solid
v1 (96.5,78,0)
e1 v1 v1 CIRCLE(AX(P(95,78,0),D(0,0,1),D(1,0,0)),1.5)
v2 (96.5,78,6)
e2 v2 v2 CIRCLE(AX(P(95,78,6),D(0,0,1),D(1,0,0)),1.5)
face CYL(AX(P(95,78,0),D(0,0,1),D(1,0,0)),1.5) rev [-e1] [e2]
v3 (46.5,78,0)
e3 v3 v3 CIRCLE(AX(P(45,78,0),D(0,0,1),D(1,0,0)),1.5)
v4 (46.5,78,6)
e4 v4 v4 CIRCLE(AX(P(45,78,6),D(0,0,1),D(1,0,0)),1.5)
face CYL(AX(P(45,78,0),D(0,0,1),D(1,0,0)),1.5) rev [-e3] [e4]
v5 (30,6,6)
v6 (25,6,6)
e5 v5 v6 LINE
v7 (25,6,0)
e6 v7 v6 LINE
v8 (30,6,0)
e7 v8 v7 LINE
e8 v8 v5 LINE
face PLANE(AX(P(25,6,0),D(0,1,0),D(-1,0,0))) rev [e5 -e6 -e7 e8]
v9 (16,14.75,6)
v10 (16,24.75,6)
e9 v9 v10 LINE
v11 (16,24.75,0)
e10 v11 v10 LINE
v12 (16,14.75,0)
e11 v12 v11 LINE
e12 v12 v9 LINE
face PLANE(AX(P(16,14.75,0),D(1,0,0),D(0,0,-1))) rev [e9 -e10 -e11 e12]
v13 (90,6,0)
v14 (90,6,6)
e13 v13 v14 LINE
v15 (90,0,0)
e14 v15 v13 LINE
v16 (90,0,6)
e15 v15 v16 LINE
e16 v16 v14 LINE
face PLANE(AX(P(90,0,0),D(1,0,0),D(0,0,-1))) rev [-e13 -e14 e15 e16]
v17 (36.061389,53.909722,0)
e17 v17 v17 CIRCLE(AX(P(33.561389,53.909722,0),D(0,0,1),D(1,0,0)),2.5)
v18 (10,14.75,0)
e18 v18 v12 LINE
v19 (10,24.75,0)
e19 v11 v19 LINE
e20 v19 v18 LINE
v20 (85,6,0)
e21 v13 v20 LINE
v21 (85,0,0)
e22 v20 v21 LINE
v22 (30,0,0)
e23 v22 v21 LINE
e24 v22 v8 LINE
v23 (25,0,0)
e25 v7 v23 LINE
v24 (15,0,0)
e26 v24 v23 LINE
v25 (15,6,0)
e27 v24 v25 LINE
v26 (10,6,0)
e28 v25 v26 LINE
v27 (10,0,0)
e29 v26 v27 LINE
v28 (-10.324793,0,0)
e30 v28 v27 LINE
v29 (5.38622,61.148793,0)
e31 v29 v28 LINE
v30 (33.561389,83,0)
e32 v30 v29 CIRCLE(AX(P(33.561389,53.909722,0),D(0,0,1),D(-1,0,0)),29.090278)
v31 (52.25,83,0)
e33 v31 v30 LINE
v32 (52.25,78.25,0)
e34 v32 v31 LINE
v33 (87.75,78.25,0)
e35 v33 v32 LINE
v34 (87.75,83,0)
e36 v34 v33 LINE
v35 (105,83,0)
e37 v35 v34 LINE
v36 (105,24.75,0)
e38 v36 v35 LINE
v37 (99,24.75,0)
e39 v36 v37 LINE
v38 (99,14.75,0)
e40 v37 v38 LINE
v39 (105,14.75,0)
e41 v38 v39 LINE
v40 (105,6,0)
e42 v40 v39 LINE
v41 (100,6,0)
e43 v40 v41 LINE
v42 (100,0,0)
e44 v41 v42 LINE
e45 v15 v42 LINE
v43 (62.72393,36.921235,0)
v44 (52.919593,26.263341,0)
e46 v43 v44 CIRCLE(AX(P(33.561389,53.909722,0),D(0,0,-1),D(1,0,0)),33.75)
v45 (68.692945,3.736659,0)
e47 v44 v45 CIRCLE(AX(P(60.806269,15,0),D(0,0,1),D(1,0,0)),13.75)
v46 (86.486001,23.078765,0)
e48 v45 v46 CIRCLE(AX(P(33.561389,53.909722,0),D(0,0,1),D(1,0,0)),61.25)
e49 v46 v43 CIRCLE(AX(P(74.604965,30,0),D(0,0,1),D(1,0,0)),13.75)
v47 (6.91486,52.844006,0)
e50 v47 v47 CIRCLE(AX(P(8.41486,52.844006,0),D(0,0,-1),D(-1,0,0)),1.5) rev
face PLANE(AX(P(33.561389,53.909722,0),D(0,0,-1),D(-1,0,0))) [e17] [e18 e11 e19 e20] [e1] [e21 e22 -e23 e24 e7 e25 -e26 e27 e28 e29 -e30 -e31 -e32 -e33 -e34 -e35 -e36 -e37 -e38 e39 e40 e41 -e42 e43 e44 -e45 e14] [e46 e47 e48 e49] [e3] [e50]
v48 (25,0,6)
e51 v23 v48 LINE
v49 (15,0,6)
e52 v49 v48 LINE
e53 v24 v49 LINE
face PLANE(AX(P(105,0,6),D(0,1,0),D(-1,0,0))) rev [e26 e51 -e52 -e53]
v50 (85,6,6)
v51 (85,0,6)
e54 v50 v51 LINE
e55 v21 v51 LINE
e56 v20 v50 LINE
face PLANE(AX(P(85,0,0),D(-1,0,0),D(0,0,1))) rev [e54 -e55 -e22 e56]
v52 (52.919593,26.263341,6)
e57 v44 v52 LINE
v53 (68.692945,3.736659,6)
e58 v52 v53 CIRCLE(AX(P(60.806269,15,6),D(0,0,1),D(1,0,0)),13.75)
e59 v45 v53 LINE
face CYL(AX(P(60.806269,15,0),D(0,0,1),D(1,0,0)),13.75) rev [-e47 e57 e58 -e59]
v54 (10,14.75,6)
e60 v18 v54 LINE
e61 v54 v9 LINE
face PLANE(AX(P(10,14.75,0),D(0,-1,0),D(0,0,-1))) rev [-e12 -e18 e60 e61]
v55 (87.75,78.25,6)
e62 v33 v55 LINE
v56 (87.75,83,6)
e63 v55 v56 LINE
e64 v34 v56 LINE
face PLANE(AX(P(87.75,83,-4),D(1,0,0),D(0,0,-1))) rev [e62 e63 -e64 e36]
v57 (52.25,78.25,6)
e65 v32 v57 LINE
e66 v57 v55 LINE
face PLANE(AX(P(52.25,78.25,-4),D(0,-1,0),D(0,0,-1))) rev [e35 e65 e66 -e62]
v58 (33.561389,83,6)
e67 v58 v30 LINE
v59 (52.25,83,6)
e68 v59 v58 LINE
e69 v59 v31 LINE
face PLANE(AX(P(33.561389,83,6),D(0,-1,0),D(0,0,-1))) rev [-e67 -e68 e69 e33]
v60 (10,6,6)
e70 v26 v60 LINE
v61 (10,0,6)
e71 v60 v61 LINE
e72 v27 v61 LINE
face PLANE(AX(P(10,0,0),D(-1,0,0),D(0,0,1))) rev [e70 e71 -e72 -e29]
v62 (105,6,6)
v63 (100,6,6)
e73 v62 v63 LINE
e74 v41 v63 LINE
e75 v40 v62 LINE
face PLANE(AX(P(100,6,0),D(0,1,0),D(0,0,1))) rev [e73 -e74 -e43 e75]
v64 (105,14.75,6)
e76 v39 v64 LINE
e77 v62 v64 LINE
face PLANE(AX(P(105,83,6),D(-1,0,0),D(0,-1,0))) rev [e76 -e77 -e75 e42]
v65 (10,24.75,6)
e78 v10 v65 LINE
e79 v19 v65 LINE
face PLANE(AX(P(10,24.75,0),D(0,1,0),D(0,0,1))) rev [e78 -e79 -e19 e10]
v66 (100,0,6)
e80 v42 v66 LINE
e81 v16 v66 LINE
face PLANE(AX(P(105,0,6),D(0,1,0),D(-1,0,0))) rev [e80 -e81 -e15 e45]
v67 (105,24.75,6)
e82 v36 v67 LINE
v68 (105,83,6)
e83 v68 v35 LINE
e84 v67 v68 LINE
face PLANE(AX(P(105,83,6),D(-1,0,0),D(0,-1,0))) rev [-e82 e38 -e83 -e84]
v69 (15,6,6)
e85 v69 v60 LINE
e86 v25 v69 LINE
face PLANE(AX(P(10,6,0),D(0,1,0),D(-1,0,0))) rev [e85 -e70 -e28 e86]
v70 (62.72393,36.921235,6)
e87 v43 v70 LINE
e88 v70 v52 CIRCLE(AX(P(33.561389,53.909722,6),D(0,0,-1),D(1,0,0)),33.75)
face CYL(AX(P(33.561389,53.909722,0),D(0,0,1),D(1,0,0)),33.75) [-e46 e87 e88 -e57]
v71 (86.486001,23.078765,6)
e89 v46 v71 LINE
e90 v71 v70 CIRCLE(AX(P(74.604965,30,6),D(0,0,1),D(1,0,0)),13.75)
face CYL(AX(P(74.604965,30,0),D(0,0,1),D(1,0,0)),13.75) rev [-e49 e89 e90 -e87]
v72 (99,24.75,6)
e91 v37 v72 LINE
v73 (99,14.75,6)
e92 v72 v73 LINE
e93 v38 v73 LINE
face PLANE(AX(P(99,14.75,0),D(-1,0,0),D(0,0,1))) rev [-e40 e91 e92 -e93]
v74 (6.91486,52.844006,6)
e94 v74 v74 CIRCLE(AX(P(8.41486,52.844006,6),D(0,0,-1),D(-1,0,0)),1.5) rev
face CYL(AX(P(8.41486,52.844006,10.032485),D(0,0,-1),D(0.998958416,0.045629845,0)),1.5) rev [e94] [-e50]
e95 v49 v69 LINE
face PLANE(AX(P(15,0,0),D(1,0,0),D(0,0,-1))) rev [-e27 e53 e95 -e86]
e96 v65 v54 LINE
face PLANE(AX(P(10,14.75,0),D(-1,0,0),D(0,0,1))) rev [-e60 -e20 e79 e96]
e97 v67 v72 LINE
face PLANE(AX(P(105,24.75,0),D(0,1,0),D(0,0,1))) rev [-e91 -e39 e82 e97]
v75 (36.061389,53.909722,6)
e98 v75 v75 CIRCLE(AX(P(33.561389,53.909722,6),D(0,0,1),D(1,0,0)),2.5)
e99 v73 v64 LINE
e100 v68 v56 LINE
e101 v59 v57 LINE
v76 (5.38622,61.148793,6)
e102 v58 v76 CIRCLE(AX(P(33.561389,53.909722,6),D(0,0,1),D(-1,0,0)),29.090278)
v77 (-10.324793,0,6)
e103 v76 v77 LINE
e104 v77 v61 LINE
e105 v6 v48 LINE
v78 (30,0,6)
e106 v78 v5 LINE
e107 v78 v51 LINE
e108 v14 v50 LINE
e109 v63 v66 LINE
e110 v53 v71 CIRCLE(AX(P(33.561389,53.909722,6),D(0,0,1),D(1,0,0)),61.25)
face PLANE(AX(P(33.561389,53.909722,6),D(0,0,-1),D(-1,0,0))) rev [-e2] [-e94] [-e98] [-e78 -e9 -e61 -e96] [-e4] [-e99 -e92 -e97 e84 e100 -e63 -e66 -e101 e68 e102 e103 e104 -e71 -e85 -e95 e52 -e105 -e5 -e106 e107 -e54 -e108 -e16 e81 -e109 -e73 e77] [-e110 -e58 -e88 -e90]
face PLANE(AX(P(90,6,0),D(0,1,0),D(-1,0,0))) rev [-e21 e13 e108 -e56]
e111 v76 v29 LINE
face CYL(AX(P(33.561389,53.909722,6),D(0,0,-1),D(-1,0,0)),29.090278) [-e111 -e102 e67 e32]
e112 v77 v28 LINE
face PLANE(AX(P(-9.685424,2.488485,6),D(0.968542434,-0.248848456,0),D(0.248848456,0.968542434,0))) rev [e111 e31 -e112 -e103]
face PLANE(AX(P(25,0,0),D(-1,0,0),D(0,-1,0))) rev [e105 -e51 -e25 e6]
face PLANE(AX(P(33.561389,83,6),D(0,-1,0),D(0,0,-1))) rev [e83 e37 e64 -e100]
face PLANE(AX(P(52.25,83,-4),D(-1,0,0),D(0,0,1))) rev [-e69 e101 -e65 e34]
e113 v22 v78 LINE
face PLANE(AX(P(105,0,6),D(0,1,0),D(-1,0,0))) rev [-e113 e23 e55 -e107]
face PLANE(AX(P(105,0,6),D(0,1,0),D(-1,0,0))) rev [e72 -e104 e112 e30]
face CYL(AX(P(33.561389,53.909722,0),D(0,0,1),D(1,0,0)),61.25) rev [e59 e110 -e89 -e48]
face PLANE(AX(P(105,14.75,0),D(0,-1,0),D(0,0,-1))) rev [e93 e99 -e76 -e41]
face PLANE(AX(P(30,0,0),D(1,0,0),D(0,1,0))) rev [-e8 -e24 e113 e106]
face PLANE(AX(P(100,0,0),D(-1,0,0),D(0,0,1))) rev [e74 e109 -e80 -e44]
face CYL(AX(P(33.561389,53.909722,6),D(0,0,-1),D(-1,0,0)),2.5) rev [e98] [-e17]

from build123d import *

# Parameters (mm, degrees)
SKETCH1_R           = 2.5
BOSS_EXTRUDE1_DEPTH = 6
SKETCH2_W           = 5
SKETCH2_H           = 6
SKETCH2_W_2         = 6
SKETCH2_H_2         = 10
CUT_EXTRUDE1_DEPTH  = 134.97761007
SKETCH3_R           = 1.5
CUT_EXTRUDE2_DEPTH  = 134.97761007
SKETCH4_W           = 35.5
SKETCH4_H           = 4.75
CUT_EXTRUDE3_DEPTH  = 10
CAVITY1_OUTLINE_R   = 1.5
CAVITY1_DEPTH       = 6
CUT_EXTRUDE4_DEPTH  = 134.97761007


# Read off the part's stored shape, not the designer's step: Cavity1
with BuildPart() as part:
    # Sketch1 → Boss-Extrude1 (new body)
    with BuildSketch(Plane.XY):
        with BuildLine():
            Line((-9.685424338, 2.488484559), (5.386220056, 61.148792841))
            ThreePointArc((5.386220056, 61.148792841), (15.733633721, 76.897010412), (33.561388608, 83))
            Line((33.561388608, 83), (105, 83))
            Line((105, 83), (105, 0))
            Line((105, 0), (-10.324792855, 0))
            Line((-10.324792855, 0), (-9.685424338, 2.488484559))
        make_face()
        with Locations((33.561388608, 53.909722104)):
            Circle(SKETCH1_R, mode=Mode.SUBTRACT)
        with BuildLine():
            ThreePointArc((67.975974789, 4.760599446), (77.719162031, 13.288409394), (85.405906554, 23.707967867))
            ThreePointArc((85.405906554, 23.707967867), (80.896997447, 40.800941239), (63.804024076, 36.292032133))
            ThreePointArc((63.804024076, 36.292032133), (59.320089771, 30.213956356), (53.63656388, 25.239400554))
            ThreePointArc((53.63656388, 25.239400554), (50.566868781, 7.830294546), (67.975974789, 4.760599446))
        make_face(mode=Mode.SUBTRACT)
    extrude(amount=BOSS_EXTRUDE1_DEPTH)

    # Sketch2 → Cut-Extrude1 (cut, through all)
    with BuildSketch(Plane.XY.offset(6)):
        with Locations((12.5, 3)):
            Rectangle(SKETCH2_W, SKETCH2_H)
        with Locations((102.5, 3)):
            Rectangle(SKETCH2_W, SKETCH2_H)
        with Locations((27.5, 3)):
            Rectangle(SKETCH2_W, SKETCH2_H)
        with Locations((87.5, 3)):
            Rectangle(SKETCH2_W, SKETCH2_H)
        with Locations((102, 19.75)):
            Rectangle(SKETCH2_W_2, SKETCH2_H_2)
        with Locations((13, 19.75)):
            Rectangle(SKETCH2_W_2, SKETCH2_H_2)
    extrude(amount=-CUT_EXTRUDE1_DEPTH, mode=Mode.SUBTRACT)

    # Sketch3 → Cut-Extrude2 (cut, through all)
    with BuildSketch(Plane.XY.offset(6)):
        with Locations((95, 78)):
            Circle(SKETCH3_R)
        with Locations((45, 78)):
            Circle(SKETCH3_R)
    extrude(amount=-CUT_EXTRUDE2_DEPTH, mode=Mode.SUBTRACT)

    # Sketch4 → Cut-Extrude3 (cut)
    with BuildSketch(Plane.XY.offset(6)):
        with Locations((70, 80.625)):
            Rectangle(SKETCH4_W, SKETCH4_H)
    extrude(amount=-CUT_EXTRUDE3_DEPTH, mode=Mode.SUBTRACT)

    # Cavity1 outline → Cavity1 (cut)
    with BuildSketch(Plane.XY):
        with Locations((8.414860226, 52.844005614)):
            Circle(CAVITY1_OUTLINE_R)
    extrude(amount=CAVITY1_DEPTH, mode=Mode.SUBTRACT)

    # Sketch5 → Cut-Extrude4 (cut, through all)
    with BuildSketch(Plane.XY.offset(6)):
        with BuildLine():
            ThreePointArc((52.919593335, 26.263340609), (49.542928725, 7.113324), (68.692945334, 3.736659391))
            ThreePointArc((68.692945334, 3.736659391), (78.639115644, 12.442132046), (86.486000678, 23.078764654))
            ThreePointArc((86.486000678, 23.078764654), (81.526200661, 41.881035363), (62.723929952, 36.921235346))
            ThreePointArc((62.723929952, 36.921235346), (58.400136158, 31.060233704), (52.919593335, 26.263340609))
        make_face()
    extrude(amount=-CUT_EXTRUDE4_DEPTH, mode=Mode.SUBTRACT)


solid = part.part
